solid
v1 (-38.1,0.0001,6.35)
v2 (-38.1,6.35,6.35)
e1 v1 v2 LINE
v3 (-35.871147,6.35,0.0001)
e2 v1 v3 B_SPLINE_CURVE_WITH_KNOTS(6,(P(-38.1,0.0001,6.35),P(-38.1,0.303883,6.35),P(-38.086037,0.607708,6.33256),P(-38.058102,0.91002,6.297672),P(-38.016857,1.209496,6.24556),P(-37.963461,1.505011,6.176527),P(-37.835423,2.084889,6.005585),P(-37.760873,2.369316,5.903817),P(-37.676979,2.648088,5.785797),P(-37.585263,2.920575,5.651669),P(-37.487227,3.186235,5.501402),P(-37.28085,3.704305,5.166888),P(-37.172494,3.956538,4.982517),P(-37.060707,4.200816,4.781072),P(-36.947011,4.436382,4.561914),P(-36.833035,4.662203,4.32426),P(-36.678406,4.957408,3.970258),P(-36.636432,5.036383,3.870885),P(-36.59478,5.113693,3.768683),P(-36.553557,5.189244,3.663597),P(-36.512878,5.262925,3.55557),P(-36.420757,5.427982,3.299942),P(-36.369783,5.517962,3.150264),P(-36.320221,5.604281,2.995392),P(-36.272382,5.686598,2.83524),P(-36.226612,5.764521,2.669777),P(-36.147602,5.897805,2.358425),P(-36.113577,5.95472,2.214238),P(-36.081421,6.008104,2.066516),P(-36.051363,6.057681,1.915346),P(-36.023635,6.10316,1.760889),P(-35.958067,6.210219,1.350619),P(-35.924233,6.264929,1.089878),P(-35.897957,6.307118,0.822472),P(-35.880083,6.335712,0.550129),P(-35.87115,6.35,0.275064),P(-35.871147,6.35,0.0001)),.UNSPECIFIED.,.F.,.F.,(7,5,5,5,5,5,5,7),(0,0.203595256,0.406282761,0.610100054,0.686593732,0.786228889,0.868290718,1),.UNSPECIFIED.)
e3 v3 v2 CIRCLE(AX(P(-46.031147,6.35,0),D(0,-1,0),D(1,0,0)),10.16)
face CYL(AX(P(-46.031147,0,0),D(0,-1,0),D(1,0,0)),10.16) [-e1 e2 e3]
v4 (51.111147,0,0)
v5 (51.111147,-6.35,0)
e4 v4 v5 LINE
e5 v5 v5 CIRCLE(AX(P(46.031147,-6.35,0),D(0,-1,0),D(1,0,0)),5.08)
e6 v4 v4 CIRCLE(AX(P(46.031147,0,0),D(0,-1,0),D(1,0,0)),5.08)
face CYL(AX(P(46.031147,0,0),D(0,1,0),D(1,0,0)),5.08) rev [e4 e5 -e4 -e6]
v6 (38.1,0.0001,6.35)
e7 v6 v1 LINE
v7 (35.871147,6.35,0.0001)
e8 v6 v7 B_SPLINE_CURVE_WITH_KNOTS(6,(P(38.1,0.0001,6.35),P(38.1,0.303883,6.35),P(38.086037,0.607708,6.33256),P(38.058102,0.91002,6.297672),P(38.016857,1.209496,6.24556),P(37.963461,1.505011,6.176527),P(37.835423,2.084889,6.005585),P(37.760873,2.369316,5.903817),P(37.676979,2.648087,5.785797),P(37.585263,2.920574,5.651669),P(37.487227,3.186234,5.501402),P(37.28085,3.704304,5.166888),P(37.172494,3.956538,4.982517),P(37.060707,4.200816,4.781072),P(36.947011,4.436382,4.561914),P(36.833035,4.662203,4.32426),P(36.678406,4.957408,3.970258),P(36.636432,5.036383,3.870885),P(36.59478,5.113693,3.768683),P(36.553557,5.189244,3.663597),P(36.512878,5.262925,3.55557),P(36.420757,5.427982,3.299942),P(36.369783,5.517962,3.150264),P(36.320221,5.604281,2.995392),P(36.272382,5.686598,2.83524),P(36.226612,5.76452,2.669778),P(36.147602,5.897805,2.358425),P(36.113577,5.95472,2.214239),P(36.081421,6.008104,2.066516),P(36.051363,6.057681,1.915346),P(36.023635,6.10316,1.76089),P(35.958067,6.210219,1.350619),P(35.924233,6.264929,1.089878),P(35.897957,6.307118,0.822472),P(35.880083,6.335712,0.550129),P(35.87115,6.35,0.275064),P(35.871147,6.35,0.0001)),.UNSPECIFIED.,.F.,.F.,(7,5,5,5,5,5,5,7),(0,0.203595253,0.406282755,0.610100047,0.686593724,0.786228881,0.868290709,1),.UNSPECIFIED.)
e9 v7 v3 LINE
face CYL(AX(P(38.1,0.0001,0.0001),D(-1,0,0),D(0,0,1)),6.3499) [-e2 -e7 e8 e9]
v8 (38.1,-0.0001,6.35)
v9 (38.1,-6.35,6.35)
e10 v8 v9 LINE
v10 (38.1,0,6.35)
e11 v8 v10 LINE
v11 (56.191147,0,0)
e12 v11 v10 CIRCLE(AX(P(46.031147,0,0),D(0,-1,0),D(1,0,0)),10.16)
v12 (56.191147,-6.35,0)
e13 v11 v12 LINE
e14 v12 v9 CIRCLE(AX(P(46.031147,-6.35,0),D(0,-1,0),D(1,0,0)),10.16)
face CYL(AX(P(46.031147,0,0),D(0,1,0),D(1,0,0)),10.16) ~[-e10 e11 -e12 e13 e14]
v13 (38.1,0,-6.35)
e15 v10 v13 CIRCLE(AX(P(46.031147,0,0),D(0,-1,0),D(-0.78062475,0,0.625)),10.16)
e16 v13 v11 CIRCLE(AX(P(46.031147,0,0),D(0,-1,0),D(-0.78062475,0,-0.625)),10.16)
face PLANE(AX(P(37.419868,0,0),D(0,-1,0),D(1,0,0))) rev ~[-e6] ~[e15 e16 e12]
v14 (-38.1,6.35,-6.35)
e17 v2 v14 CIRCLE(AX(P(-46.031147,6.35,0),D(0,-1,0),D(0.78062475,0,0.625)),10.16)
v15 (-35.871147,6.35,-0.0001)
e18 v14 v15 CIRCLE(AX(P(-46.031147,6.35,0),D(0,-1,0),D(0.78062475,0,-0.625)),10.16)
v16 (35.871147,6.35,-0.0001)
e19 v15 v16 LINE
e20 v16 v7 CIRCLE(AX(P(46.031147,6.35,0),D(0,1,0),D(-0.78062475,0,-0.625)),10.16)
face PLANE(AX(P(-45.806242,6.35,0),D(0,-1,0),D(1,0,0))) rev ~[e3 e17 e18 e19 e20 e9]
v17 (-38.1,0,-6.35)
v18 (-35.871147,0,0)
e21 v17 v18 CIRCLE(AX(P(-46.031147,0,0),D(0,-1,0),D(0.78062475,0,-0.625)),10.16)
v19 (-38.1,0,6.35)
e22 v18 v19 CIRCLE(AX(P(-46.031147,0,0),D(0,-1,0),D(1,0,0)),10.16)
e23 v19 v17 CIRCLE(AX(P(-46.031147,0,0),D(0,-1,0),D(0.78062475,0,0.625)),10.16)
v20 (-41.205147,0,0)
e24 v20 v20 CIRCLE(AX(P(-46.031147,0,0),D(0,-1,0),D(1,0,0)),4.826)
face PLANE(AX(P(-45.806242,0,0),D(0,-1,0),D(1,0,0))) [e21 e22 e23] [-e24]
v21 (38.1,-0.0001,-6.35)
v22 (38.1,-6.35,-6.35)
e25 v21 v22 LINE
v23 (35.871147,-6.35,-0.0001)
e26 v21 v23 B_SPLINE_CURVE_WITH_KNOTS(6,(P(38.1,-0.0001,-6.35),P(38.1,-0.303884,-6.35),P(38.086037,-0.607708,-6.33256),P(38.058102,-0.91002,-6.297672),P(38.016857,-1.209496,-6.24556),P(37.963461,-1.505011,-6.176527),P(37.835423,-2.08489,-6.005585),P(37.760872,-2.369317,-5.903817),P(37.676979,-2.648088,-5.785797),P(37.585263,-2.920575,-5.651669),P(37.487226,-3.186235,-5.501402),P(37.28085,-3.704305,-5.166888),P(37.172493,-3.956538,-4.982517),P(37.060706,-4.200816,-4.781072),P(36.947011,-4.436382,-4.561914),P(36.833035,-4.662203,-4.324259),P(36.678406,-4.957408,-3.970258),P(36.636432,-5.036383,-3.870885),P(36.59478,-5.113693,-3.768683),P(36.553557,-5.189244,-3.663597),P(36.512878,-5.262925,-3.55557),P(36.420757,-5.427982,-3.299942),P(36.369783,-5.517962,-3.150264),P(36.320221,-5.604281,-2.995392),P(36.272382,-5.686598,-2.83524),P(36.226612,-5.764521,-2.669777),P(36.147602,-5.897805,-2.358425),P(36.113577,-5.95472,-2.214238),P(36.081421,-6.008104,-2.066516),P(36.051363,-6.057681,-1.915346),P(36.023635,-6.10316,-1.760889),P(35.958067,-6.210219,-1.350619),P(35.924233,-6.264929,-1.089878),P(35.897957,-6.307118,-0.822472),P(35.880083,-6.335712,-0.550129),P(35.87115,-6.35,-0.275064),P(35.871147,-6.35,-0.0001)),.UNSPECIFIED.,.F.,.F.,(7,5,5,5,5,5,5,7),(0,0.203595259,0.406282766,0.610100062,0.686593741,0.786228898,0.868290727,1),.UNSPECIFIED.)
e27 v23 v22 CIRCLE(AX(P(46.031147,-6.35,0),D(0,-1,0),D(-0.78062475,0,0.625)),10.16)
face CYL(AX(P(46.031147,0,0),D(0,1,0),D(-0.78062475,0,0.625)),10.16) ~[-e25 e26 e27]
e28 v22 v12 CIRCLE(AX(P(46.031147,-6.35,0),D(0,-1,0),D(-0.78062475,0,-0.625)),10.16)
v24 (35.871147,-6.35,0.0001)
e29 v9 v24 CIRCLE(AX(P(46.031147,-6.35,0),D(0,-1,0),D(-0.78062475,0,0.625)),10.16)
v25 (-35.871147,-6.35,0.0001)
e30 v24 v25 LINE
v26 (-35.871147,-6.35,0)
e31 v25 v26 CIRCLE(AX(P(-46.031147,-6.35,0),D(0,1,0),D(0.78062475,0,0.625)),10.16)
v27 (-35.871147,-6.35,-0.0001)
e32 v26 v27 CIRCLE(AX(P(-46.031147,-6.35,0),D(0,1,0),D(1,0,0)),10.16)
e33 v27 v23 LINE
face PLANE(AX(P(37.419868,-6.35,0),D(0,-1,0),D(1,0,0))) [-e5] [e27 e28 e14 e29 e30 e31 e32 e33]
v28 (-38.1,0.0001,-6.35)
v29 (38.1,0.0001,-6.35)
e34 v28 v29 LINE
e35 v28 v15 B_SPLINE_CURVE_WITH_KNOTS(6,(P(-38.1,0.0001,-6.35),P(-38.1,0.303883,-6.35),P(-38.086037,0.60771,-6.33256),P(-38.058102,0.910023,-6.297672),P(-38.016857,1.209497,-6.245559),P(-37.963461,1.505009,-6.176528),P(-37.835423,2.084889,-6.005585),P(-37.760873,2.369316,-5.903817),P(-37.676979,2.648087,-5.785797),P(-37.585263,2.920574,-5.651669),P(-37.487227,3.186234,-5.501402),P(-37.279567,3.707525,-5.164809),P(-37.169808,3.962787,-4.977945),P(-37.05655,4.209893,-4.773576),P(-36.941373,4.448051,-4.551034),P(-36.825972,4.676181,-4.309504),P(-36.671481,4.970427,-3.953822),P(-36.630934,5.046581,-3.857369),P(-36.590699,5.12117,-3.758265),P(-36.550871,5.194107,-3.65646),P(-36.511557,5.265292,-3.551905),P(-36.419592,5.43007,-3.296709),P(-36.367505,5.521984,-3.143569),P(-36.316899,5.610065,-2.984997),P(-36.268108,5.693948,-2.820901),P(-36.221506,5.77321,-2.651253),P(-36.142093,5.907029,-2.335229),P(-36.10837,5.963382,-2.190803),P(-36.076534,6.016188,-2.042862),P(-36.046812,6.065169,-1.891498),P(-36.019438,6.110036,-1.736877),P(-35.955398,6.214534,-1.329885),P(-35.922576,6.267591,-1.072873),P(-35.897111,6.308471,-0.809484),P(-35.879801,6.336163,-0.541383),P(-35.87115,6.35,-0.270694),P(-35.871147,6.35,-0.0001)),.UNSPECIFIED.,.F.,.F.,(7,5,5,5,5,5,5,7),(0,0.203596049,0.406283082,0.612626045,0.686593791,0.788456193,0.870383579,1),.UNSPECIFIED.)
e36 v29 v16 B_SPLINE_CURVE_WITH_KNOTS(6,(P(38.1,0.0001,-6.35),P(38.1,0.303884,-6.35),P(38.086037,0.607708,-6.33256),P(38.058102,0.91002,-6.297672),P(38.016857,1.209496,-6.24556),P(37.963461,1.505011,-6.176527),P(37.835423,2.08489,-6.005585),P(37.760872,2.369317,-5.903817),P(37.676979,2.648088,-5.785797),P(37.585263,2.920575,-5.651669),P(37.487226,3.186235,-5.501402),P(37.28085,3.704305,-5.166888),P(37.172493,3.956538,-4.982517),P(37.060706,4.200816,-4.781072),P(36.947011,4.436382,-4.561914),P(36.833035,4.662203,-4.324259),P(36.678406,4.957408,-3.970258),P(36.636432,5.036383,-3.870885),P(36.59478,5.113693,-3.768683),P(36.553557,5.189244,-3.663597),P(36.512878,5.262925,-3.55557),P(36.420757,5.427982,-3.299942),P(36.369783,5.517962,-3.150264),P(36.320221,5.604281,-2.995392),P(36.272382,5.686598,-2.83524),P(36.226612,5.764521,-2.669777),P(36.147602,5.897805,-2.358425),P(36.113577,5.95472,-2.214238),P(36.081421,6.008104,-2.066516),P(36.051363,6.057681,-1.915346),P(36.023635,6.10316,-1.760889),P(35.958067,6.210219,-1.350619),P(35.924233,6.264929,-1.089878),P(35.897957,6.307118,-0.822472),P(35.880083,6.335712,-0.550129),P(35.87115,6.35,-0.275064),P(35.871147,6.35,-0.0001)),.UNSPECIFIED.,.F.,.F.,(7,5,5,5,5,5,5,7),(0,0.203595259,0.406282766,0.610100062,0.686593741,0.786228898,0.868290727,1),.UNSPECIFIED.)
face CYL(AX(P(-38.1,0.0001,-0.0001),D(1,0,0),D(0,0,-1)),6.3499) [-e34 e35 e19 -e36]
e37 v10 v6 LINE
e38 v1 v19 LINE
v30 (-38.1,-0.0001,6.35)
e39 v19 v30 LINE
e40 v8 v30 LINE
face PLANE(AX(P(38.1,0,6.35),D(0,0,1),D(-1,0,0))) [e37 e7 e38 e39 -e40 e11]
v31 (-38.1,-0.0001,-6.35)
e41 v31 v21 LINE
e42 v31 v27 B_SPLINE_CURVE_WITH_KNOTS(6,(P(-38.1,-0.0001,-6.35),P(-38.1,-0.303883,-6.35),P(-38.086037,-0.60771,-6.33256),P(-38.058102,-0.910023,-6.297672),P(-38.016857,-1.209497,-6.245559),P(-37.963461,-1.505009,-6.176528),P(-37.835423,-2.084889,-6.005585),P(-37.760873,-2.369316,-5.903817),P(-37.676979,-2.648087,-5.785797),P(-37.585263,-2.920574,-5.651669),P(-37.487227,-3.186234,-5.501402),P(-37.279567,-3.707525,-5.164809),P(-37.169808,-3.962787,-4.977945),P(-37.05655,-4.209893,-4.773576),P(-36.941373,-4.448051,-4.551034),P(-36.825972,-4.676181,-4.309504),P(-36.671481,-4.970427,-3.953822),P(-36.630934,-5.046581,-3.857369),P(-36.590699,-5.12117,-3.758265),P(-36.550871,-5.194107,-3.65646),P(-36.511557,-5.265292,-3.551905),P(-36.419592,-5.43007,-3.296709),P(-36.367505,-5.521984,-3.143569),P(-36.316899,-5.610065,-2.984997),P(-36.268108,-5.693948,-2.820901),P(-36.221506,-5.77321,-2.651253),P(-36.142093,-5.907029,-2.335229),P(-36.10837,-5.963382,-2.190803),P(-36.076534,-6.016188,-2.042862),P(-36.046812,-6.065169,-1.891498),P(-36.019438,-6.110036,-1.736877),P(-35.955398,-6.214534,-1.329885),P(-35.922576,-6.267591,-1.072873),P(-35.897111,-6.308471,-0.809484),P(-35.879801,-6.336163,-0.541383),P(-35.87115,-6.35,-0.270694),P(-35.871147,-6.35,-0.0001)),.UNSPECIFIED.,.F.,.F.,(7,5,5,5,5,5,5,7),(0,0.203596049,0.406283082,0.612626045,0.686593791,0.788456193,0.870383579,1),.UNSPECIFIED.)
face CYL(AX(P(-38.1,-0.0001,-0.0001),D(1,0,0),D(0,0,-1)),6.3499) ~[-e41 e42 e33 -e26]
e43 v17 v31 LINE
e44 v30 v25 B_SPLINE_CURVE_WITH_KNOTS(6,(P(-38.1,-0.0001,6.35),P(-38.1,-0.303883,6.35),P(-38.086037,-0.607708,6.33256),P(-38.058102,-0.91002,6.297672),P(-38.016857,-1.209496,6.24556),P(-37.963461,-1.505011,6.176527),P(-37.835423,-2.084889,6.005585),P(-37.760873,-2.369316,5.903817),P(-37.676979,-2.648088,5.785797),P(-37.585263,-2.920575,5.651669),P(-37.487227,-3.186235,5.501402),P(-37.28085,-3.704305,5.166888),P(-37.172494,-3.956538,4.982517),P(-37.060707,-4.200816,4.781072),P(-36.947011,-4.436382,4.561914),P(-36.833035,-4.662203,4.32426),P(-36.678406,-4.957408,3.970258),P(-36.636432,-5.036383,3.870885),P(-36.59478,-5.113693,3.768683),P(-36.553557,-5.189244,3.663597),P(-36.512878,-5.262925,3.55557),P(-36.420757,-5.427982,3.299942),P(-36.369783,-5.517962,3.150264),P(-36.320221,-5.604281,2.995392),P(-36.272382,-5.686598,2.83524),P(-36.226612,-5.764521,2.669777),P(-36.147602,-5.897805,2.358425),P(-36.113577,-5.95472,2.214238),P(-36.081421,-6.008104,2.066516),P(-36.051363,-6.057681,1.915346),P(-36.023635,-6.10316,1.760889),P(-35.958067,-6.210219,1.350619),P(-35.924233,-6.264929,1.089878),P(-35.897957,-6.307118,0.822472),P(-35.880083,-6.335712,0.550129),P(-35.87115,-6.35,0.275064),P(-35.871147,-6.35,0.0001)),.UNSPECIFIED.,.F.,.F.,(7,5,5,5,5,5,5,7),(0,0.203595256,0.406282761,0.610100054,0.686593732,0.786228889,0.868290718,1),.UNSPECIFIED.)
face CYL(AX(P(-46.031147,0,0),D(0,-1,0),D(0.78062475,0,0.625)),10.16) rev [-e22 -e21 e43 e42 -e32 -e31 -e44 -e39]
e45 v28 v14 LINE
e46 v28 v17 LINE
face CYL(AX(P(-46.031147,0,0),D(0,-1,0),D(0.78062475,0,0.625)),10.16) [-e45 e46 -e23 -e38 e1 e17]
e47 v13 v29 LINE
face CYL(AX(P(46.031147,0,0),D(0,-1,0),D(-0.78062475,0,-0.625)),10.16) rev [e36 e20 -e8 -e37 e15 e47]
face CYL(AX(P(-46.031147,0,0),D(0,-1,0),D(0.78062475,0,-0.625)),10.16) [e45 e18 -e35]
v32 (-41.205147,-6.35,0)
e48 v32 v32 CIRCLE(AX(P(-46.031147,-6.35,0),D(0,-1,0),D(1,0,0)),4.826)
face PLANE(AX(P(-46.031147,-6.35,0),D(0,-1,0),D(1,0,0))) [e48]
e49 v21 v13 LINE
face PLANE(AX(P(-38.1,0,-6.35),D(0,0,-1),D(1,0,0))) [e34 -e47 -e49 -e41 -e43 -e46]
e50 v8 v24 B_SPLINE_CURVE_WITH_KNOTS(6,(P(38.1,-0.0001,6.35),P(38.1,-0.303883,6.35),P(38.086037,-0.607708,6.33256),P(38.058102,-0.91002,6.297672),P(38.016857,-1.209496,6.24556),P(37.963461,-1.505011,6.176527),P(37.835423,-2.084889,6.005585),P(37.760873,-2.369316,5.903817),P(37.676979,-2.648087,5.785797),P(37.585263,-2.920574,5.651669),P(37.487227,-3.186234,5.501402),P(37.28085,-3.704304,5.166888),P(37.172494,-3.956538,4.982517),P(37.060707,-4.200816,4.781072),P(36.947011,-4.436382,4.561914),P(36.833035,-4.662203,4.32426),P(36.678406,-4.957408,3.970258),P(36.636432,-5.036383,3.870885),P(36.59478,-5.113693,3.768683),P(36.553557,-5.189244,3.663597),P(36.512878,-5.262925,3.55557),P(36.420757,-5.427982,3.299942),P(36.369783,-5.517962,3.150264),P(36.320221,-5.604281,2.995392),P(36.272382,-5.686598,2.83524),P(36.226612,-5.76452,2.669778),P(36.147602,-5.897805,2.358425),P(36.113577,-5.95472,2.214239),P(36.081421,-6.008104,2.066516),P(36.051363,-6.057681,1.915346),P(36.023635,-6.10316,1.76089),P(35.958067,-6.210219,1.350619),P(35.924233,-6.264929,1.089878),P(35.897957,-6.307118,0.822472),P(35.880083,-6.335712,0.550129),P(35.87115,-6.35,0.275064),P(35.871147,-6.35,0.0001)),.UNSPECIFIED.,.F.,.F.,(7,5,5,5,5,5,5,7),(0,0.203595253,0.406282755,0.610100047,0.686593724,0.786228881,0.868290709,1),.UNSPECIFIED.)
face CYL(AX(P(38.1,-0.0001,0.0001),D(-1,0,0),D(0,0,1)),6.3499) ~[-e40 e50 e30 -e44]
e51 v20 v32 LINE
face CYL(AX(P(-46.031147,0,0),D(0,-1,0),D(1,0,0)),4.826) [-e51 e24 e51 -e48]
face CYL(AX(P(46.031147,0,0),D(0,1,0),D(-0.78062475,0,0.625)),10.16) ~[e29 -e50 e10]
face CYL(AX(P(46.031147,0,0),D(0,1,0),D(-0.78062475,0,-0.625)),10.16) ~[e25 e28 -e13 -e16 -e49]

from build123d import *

# Parameters (mm, degrees)
F1_DEPTH = 6.35
F2_R     = 6.3499
F0_R     = 5.08
F3_DEPTH = 6.35
F0_R_2   = 4.826
F4_DEPTH = 6.35
F5_DEPTH = 6.35


# Not quite as in the source:
# - a fillet or chamfer is up to 0.001 mm smaller than in the source, because OpenCascade refuses the exact size


with BuildPart() as f1:
    # F0 (on Front) → F1 (new body, symmetric)
    with BuildSketch(Plane.XZ):
        with BuildLine():
            Line((38.1, 6.35), (-38.1, 6.35))
            ThreePointArc((-38.1, 6.35), (-36.4445407024, 3.3649028089), (-35.871147458, 0))
            ThreePointArc((-35.871147458, 0), (-36.4445407024, -3.3649028089), (-38.1, -6.35))
            Line((-38.1, -6.35), (38.1, -6.35))
            ThreePointArc((38.1, -6.35), (35.871147458, 0), (38.1, 6.35))
        make_face()
    extrude(amount=F1_DEPTH, both=True)

    # F2 (radius 6.35 in the source; OpenCascade refuses exactly that, so slightly less here)
    f2_edges = [f1.edges().sort_by_distance(p)[0] for p in [
        (0, -6.35, 6.35),
        (0, 6.35, 6.35),
        (0, -6.35, -6.35),
        (0, 6.35, -6.35),
    ]]
    fillet(f2_edges, radius=F2_R)

    # F0 (on Front) → F3 (join)
    with BuildSketch(Plane.XZ):
        with BuildLine():
            Line((38.1, -6.35), (38.1, 6.35))
            ThreePointArc((38.1, 6.35), (35.871147458, 0), (38.1, -6.35))
        make_face()
        with BuildLine():
            ThreePointArc((56.191147458, 0), (49.3960502669, 9.5866067556), (38.1, 6.35))
            Line((38.1, 6.35), (38.1, -6.35))
            ThreePointArc((38.1, -6.35), (49.3960502669, -9.5866067556), (56.191147458, 0))
        make_face()
        with Locations((46.031147458, 0)):
            Circle(F0_R, mode=Mode.SUBTRACT)
    extrude(amount=F3_DEPTH)

    # F0 (on Front) → F4 (join)
    with BuildSketch(Plane.XZ):
        with BuildLine():
            Line((-38.1, -6.35), (-38.1, 6.35))
            ThreePointArc((-38.1, 6.35), (-56.191147458, 0), (-38.1, -6.35))
        make_face()
        with Locations((-46.031147458, 0)):
            Circle(F0_R_2, mode=Mode.SUBTRACT)
        with BuildLine():
            ThreePointArc((-35.871147458, 0), (-36.4445407024, 3.3649028089), (-38.1, 6.35))
            Line((-38.1, 6.35), (-38.1, -6.35))
            ThreePointArc((-38.1, -6.35), (-36.4445407024, -3.3649028089), (-35.871147458, 0))
        make_face()
    extrude(amount=-F4_DEPTH)

    # F0 (on Front) → F5 (join, symmetric)
    with BuildSketch(Plane.XZ):
        with Locations((-46.031147458, 0)):
            Circle(F0_R_2)
    extrude(amount=F5_DEPTH, both=True)


solid = f1.part
